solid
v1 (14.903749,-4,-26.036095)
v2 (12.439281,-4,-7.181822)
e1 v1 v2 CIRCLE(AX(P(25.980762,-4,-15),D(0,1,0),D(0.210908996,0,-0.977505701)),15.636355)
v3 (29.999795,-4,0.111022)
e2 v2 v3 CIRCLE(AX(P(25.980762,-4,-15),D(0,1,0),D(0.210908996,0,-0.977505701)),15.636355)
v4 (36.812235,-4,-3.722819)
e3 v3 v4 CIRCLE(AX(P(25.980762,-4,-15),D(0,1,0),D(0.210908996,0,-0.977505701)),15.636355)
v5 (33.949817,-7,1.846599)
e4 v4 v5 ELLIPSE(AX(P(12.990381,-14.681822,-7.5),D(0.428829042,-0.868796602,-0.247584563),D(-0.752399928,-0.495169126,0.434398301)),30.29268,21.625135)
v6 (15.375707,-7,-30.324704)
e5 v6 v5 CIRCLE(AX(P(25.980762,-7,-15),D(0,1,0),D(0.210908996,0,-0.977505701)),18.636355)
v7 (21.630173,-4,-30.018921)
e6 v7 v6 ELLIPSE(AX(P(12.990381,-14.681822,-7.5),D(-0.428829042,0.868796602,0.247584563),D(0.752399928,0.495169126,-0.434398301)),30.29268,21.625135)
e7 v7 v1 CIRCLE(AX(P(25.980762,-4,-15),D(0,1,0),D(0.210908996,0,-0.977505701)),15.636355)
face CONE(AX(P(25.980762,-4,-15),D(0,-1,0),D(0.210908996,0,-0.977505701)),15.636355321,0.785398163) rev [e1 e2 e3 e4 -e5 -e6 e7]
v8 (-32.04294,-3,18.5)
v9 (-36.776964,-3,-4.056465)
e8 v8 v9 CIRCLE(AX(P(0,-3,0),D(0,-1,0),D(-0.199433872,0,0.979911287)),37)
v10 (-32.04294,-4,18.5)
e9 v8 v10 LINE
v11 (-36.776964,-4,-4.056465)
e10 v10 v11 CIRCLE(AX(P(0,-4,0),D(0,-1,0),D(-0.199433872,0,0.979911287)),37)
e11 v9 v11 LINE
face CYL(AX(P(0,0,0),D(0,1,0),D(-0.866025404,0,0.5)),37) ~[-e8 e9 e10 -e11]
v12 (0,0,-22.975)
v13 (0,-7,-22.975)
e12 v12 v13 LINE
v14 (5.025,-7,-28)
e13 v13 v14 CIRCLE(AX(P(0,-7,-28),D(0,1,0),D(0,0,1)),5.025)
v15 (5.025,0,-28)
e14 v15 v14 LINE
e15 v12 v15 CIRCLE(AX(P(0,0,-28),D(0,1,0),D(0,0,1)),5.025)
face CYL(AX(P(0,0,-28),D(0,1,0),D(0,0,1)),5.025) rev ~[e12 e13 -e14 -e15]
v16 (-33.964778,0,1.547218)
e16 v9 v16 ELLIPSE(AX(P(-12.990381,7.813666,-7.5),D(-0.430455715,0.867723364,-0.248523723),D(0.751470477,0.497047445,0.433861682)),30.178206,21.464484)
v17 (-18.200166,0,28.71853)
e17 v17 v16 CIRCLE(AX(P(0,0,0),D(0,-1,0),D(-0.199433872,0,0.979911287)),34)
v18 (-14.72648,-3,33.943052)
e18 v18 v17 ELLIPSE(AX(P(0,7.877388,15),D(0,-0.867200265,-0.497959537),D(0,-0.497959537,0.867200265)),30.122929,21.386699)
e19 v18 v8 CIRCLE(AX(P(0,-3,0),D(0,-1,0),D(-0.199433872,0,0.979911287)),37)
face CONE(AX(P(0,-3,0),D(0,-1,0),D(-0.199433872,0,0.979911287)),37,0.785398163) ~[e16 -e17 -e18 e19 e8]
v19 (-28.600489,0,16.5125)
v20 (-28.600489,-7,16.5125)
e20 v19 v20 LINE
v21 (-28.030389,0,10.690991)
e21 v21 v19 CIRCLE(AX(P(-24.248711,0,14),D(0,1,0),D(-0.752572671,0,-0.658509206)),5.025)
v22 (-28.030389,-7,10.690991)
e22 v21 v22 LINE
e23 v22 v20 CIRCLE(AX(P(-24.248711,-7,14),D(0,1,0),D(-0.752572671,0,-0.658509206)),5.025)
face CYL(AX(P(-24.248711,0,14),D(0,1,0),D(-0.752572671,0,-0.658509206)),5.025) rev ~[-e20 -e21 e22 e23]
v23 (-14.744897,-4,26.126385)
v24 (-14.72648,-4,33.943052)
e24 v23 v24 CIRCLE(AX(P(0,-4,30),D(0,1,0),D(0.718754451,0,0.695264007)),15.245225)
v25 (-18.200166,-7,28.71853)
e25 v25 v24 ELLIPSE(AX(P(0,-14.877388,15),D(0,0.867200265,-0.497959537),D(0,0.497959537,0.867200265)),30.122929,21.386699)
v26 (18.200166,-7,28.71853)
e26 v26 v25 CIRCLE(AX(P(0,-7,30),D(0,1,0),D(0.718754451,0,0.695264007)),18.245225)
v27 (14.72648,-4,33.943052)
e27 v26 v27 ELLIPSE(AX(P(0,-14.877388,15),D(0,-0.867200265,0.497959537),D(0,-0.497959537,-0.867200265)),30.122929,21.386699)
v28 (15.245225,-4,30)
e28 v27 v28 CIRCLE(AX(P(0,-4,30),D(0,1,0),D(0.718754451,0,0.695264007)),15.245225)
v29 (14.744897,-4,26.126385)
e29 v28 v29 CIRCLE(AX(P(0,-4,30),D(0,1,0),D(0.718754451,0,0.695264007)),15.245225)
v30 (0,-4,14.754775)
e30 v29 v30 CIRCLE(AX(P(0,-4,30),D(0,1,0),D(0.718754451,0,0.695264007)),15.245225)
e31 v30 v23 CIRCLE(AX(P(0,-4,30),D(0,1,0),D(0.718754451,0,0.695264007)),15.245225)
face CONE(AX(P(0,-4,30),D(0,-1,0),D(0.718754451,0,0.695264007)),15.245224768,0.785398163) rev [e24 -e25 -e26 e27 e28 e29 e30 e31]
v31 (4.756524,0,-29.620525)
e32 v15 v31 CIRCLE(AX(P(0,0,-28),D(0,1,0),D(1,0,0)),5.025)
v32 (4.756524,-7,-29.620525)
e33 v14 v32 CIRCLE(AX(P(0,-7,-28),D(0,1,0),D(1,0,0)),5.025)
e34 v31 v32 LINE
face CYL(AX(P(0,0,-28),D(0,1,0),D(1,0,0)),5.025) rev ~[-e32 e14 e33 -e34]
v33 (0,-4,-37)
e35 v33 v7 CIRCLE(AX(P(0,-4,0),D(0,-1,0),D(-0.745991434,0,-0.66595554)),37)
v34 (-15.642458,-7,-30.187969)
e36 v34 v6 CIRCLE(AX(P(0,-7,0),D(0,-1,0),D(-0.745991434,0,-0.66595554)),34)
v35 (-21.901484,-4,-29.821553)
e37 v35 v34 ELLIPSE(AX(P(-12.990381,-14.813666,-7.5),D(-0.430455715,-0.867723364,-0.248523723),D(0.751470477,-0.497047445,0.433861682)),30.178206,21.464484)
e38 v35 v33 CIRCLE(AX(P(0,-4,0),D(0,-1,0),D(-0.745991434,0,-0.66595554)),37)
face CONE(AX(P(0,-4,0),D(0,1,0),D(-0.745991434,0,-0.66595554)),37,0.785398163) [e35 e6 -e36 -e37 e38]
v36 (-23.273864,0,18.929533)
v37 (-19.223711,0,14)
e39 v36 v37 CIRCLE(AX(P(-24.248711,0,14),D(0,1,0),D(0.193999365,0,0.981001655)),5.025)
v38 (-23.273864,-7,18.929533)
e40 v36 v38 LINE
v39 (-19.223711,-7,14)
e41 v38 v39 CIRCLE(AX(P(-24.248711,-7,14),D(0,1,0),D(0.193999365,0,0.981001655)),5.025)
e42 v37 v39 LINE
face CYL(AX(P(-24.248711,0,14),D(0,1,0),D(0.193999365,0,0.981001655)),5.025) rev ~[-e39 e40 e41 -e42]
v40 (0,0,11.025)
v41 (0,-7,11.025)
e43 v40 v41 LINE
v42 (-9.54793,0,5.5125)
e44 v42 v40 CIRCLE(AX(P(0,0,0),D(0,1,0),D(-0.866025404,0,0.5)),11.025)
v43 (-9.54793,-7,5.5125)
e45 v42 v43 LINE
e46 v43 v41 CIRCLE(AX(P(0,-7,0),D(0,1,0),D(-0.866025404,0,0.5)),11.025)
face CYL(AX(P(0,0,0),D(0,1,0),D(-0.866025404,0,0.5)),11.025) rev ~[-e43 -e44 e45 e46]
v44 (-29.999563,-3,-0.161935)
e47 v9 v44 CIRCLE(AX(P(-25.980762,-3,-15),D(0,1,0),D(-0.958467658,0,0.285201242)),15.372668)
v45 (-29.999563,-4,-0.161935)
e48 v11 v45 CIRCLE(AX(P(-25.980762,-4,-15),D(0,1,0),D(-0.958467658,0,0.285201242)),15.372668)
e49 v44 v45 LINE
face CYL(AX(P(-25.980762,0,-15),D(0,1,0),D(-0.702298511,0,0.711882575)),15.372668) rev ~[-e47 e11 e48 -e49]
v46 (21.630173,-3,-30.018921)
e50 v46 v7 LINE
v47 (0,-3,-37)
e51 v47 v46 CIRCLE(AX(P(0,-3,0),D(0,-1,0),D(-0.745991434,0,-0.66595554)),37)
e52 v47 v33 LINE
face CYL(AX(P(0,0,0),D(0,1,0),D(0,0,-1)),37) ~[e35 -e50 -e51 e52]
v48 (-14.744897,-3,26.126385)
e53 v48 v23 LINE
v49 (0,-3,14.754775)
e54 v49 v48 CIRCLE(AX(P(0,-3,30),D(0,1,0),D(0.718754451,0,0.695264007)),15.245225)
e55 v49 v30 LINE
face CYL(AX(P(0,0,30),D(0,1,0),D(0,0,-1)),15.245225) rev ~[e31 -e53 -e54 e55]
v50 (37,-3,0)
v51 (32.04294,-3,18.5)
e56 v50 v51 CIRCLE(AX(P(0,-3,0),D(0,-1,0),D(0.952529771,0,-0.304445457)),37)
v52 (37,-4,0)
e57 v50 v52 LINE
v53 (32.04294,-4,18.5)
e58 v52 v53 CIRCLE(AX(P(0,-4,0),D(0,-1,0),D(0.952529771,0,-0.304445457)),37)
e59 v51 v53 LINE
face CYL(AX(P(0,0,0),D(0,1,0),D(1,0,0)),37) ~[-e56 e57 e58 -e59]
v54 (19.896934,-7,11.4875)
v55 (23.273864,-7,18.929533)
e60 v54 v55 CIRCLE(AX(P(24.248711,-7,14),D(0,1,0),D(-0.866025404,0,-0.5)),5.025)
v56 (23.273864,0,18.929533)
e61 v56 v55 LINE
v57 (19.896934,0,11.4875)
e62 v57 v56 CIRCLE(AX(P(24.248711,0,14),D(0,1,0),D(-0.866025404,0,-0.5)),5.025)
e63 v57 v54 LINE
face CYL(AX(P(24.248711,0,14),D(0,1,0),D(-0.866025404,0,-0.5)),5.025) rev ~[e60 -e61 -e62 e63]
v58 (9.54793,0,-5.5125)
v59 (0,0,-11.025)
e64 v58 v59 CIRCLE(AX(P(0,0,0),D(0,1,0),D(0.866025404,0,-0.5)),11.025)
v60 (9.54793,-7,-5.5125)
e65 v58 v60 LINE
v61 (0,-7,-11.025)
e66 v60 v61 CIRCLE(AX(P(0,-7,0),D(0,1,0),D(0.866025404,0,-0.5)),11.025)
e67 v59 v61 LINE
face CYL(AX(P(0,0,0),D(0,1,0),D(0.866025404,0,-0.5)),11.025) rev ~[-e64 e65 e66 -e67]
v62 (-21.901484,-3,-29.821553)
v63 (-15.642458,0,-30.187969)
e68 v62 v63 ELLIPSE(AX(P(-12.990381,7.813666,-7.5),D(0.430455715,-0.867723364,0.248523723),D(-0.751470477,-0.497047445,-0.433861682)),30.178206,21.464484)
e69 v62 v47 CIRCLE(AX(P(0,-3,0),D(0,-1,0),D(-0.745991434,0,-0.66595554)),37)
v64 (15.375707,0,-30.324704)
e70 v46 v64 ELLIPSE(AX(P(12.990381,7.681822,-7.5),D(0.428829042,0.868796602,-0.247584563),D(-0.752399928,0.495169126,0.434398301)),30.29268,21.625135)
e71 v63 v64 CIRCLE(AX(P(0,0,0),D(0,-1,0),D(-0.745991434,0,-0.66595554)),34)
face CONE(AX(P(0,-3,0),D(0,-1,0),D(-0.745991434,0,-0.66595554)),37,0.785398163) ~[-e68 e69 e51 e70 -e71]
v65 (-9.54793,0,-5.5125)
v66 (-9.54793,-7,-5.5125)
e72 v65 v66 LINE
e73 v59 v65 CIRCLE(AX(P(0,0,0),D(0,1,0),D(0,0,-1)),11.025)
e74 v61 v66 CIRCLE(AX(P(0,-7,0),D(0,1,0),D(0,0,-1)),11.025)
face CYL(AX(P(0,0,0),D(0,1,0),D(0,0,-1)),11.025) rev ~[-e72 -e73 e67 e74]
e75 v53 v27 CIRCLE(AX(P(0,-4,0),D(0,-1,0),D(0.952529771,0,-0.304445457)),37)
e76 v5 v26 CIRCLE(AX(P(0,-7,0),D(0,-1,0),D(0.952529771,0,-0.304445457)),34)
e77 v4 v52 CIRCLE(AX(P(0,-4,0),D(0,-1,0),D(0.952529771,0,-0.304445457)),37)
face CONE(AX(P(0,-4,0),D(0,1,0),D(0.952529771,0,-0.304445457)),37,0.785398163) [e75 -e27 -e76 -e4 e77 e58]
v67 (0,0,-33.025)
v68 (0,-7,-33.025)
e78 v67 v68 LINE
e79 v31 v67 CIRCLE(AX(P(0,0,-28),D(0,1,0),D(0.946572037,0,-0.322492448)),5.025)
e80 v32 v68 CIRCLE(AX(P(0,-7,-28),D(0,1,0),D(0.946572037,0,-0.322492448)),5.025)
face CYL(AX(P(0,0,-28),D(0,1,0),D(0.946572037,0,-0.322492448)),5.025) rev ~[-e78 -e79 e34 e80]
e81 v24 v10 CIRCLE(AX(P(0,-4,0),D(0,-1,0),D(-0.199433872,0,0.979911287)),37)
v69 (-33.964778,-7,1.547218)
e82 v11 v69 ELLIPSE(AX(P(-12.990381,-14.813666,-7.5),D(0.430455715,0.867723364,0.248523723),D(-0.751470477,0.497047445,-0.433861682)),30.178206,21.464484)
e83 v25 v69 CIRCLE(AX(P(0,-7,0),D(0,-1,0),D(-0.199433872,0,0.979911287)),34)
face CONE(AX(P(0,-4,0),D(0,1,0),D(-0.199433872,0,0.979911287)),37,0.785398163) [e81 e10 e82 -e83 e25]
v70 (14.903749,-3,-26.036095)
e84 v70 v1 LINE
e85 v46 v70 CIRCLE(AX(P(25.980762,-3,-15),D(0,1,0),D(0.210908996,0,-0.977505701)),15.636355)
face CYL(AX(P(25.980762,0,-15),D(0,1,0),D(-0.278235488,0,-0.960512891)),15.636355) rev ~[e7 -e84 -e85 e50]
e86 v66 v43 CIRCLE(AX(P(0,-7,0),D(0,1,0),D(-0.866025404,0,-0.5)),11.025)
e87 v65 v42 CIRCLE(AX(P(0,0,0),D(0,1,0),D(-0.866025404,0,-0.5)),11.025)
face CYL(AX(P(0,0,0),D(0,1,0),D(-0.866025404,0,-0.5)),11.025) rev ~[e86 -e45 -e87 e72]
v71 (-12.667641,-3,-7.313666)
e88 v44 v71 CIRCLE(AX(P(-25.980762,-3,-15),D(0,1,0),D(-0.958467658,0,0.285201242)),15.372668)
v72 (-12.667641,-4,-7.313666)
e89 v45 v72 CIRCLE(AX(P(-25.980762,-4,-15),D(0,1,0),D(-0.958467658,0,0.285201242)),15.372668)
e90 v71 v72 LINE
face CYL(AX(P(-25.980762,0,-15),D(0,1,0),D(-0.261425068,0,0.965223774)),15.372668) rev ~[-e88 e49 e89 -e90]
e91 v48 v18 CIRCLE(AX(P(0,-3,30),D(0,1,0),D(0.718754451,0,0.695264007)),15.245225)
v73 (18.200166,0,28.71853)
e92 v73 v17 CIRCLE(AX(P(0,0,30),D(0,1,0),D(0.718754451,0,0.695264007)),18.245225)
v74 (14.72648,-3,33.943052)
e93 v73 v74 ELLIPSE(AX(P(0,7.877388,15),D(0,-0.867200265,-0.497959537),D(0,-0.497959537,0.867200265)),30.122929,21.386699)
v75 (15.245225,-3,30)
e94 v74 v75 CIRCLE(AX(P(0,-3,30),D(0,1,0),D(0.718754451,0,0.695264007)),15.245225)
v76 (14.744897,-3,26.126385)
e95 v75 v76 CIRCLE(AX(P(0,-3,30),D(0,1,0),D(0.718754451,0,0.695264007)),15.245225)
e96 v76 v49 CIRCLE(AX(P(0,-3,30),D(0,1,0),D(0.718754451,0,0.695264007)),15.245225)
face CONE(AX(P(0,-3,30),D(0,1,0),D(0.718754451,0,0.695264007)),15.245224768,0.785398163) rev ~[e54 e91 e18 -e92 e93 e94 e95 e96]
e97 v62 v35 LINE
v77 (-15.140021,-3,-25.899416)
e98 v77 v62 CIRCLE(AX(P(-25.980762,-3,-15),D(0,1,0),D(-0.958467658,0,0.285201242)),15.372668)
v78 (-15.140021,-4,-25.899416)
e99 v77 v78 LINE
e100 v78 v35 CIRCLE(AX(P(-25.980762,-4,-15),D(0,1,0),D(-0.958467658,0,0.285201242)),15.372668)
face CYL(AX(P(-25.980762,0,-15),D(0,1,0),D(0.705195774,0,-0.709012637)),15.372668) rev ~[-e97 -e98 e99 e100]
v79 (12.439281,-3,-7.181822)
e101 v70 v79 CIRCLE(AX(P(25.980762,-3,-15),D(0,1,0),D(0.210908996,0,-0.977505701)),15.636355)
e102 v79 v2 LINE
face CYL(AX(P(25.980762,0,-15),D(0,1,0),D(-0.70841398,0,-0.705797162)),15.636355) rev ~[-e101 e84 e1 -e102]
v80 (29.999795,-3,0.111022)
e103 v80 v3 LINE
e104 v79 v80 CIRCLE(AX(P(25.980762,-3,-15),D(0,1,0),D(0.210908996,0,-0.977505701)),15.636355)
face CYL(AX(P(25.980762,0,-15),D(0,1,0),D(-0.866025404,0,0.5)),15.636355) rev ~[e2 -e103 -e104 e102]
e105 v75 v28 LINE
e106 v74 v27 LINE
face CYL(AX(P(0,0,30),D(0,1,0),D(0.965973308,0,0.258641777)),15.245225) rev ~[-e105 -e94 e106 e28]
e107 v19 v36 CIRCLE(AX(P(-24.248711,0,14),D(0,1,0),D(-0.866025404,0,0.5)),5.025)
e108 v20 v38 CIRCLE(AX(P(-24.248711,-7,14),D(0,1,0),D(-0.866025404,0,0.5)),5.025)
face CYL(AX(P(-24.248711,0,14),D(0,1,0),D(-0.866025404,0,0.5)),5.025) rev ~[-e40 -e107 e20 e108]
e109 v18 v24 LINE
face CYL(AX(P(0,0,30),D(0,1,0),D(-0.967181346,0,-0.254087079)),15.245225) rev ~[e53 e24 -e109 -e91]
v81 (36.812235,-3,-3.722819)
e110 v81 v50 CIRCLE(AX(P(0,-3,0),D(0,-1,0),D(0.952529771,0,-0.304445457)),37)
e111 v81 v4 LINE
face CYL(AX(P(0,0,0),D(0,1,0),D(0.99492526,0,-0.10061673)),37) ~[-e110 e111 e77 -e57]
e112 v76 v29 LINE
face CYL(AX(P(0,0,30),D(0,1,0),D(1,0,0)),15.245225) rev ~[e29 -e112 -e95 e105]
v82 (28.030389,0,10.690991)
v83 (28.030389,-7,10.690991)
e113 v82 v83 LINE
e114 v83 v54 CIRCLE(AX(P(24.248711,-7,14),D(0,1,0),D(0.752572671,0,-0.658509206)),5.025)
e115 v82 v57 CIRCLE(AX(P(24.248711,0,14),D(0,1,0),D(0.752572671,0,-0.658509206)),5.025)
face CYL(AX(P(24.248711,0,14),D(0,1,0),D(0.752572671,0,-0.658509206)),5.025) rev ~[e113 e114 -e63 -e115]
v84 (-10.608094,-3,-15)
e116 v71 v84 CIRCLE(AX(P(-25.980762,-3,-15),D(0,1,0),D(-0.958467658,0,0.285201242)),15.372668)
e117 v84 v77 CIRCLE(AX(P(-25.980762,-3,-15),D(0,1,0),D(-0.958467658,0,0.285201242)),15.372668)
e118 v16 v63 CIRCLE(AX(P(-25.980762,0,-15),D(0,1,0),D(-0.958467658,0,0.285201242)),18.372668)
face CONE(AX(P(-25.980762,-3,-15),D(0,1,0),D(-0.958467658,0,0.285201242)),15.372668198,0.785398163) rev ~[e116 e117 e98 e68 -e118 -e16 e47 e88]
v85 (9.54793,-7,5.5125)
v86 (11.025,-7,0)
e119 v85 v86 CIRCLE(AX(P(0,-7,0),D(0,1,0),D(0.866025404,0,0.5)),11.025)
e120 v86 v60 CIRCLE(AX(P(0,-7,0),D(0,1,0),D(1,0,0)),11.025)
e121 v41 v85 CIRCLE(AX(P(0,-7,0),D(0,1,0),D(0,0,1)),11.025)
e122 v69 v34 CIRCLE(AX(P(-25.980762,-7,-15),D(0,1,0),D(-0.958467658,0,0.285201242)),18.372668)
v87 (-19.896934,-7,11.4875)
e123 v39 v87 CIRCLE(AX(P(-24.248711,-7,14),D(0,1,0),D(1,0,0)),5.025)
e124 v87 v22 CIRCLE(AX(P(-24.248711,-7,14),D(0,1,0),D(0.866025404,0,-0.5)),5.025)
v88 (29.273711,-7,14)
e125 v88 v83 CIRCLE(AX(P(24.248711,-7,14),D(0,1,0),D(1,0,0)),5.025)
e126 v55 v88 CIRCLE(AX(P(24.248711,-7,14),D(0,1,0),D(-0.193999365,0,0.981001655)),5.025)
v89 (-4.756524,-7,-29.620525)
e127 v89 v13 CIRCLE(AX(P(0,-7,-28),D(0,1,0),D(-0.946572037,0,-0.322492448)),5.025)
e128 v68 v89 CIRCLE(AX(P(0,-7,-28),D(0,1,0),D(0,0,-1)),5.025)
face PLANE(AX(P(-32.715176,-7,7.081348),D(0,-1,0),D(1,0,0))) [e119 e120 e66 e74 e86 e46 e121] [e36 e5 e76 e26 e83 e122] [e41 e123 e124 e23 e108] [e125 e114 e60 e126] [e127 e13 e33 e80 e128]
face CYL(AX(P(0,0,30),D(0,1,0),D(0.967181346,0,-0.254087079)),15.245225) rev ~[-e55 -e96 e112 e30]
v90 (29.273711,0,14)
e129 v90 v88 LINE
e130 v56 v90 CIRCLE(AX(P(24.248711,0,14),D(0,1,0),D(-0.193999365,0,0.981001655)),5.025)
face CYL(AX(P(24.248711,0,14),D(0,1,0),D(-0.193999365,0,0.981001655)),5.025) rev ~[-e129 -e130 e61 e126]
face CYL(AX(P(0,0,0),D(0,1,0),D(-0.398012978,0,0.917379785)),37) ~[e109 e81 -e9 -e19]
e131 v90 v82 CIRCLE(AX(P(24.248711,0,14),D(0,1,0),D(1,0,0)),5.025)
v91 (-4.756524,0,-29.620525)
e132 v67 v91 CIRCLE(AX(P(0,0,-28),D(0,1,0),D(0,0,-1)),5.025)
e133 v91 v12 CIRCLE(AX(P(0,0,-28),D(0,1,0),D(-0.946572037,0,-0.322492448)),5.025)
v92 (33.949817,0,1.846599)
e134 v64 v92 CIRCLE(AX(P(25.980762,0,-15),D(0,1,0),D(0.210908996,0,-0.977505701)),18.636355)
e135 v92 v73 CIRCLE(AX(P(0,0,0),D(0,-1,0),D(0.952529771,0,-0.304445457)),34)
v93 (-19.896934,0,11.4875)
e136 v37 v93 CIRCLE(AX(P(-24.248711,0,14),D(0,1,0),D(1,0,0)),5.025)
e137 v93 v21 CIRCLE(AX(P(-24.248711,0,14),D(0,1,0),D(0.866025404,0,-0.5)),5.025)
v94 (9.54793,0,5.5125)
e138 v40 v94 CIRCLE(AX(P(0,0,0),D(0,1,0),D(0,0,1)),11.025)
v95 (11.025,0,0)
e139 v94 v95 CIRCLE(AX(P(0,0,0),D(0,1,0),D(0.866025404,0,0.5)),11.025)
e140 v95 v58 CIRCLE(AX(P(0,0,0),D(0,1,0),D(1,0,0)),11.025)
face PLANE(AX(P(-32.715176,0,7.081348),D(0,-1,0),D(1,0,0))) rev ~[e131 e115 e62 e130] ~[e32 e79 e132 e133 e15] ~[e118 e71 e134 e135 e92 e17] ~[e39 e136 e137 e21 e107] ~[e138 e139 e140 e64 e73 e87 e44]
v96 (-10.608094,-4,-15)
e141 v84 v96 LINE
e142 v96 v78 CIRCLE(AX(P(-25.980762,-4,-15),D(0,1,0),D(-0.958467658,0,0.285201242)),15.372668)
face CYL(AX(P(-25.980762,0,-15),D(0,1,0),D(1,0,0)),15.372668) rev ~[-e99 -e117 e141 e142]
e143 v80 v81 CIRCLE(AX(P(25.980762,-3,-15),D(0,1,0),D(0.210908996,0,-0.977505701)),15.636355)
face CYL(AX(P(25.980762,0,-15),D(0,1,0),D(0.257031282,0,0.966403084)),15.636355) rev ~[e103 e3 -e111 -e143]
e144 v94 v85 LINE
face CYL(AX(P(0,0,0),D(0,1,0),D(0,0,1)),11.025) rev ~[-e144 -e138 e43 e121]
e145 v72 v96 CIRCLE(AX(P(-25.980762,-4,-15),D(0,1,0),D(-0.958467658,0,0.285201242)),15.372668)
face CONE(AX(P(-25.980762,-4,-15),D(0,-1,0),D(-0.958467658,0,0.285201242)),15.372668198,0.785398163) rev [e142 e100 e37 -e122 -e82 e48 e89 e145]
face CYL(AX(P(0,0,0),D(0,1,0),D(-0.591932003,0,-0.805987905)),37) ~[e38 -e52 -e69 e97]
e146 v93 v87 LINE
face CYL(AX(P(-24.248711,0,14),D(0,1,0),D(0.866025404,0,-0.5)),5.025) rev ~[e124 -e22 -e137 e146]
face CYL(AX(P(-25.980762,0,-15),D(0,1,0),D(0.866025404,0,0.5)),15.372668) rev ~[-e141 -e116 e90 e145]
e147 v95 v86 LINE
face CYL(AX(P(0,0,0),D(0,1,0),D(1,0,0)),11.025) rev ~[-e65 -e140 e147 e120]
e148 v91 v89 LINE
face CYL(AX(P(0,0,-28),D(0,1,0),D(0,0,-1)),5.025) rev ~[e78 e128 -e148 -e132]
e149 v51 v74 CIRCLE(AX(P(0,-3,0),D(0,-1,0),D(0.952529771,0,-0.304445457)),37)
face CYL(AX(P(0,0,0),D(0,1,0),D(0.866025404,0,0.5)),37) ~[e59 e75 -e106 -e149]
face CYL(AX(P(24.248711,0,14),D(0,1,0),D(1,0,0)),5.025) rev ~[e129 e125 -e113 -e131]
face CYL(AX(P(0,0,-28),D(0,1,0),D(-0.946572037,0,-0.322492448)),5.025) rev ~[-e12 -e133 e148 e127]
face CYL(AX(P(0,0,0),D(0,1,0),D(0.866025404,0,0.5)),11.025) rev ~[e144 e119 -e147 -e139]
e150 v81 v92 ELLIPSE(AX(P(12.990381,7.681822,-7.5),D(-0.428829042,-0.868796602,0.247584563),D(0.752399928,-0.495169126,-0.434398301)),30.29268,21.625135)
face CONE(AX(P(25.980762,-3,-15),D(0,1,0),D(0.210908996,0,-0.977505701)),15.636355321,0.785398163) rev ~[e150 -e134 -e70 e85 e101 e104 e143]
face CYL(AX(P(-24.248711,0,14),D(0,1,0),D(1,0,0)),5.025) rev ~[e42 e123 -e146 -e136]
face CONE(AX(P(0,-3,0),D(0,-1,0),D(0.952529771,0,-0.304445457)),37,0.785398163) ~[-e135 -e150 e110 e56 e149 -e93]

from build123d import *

# Parameters (mm, degrees)
F1_DEPTH     = 7
F2_T2_ANGLE  = 96.7405372454
F2_T4_ANGLE  = 266.8582437325
F2_T6_ANGLE  = 95.969109219
F2_T8_ANGLE  = 264.3512540772
F2_T10_ANGLE = 268.0965177518
F2_T12_ANGLE = 96.2209043171
F2_T14_ANGLE = 96.2209043171
F2_T16_ANGLE = 264.3512540772
F2_T18_ANGLE = 95.969109219
F2_T20_ANGLE = 266.8582437325
F2_T22_ANGLE = 96.7405372454
F2_T24_ANGLE = 268.0965177518


# Not quite as in the source:
# - a fillet or chamfer that OpenCascade refuses, or shapes differently, is made with other operations: its cross-section is extruded or revolved along the edge and cut away or added


with BuildPart() as f1:
    # F0 (on Front) → F1 (new body)
    with BuildSketch(Plane.XZ):
        with BuildLine():
            Line((-28.60048896, 16.5125), (-32.04293994, 18.5))
            ThreePointArc((-32.04293994, 18.5), (-36.2110940276, 7.5997808734), (-36.7769641036, -4.0564653732))
            ThreePointArc((-36.7769641036, -4.0564653732), (-33.6399342951, -1.6712337769), (-29.9995629467, -0.1619351868))
            ThreePointArc((-29.9995629467, -0.1619351868), (-29.5180509711, 5.3558068364), (-28.030388979, 10.6909912395))
            ThreePointArc((-28.030388979, 10.6909912395), (-29.2497876853, 13.5102449097), (-28.60048896, 16.5125))
        make_face()
        with BuildLine():
            ThreePointArc((-28.030388979, 10.6909912395), (-29.5180509711, 5.3558068364), (-29.9995629467, -0.1619351868))
            ThreePointArc((-29.9995629467, -0.1619351868), (-20.1170678219, -0.7895806962), (-12.6676409298, -7.3136659008))
            Line((-12.6676409298, -7.3136659008), (-9.5479300767, -5.5125))
            ThreePointArc((-9.5479300767, -5.5125), (-11.025, 0), (-9.5479300767, 5.5125))
            Line((-9.5479300767, 5.5125), (-19.8969336519, 11.4875))
            ThreePointArc((-19.8969336519, 11.4875), (-23.7589562157, 8.9989236207), (-28.030388979, 10.6909912395))
        make_face()
        with BuildLine():
            ThreePointArc((0, 14.7547752324), (-9.310283358, 17.9279039927), (-14.7448970108, 26.1263853631))
            ThreePointArc((-14.7448970108, 26.1263853631), (-19.3469694385, 22.9280346638), (-23.2738644946, 18.9295333141))
            ThreePointArc((-23.2738644946, 18.9295333141), (-20.3661071395, 17.1899858756), (-19.223711306, 14))
            ThreePointArc((-19.223711306, 14), (-19.3949340289, 12.6994342984), (-19.8969336519, 11.4875))
            Line((-19.8969336519, 11.4875), (-9.5479300767, 5.5125))
            ThreePointArc((-9.5479300767, 5.5125), (-5.5125, 9.5479300767), (0, 11.025))
            Line((0, 11.025), (0, 14.7547752324))
        make_face()
        with BuildLine():
            ThreePointArc((-14.7448970108, 26.1263853631), (-15.2451824532, 30.0359191128), (-14.726480194, 33.9430520298))
            ThreePointArc((-14.726480194, 33.9430520298), (-24.6265431784, 27.6140067915), (-32.04293994, 18.5))
            Line((-32.04293994, 18.5), (-28.60048896, 16.5125))
            ThreePointArc((-28.60048896, 16.5125), (-26.3251091458, 18.5759367359), (-23.2738644946, 18.9295333141))
            ThreePointArc((-23.2738644946, 18.9295333141), (-19.3469694385, 22.9280346638), (-14.7448970108, 26.1263853631))
        make_face()
        with BuildLine():
            ThreePointArc((19.8969336519, 11.4875), (19.6727745701, 16.0763978398), (23.2738644946, 18.9295333141))
            ThreePointArc((23.2738644946, 18.9295333141), (19.3469694385, 22.9280346638), (14.7448970108, 26.1263853631))
            ThreePointArc((14.7448970108, 26.1263853631), (9.310283358, 17.9279039927), (0, 14.7547752324))
            Line((0, 14.7547752324), (0, 11.025))
            ThreePointArc((0, 11.025), (5.5125, 9.5479300767), (9.5479300767, 5.5125))
            Line((9.5479300767, 5.5125), (19.8969336519, 11.4875))
        make_face()
        with BuildLine():
            Line((28.60048896, 16.5125), (32.04293994, 18.5))
            ThreePointArc((32.04293994, 18.5), (24.6265431784, 27.6140067915), (14.726480194, 33.9430520298))
            ThreePointArc((14.726480194, 33.9430520298), (15.1149822826, 31.9885142218), (15.2452247676, 30))
            ThreePointArc((15.2452247676, 30), (15.1196254471, 28.0471035473), (14.7448970108, 26.1263853631))
            ThreePointArc((14.7448970108, 26.1263853631), (19.3469694385, 22.9280346638), (23.2738644946, 18.9295333141))
            ThreePointArc((23.2738644946, 18.9295333141), (26.3251091458, 18.5759367359), (28.60048896, 16.5125))
        make_face()
        with BuildLine():
            ThreePointArc((36.8122346311, -3.7228190211), (36.9530288431, -1.8637755563), (37, 0))
            ThreePointArc((37, 0), (35.7392555727, 9.5763046688), (32.04293994, 18.5))
            Line((32.04293994, 18.5), (28.60048896, 16.5125))
            ThreePointArc((28.60048896, 16.5125), (29.1024885831, 15.3005657016), (29.273711306, 14))
            ThreePointArc((29.273711306, 14), (28.9526221952, 12.2325590968), (28.030388979, 10.6909912395))
            ThreePointArc((28.030388979, 10.6909912395), (29.4933804082, 5.4900375314), (29.9997945679, 0.1110219992))
            ThreePointArc((29.9997945679, 0.1110219992), (33.6494620505, -1.3733111503), (36.8122346311, -3.7228190211))
        make_face()
        with BuildLine():
            ThreePointArc((12.4392811828, -7.1818223394), (19.983625223, -0.5594336383), (29.9997945679, 0.1110219992))
            ThreePointArc((29.9997945679, 0.1110219992), (29.4933804082, 5.4900375314), (28.030388979, 10.6909912395))
            ThreePointArc((28.030388979, 10.6909912395), (23.7589562157, 8.9989236207), (19.8969336519, 11.4875))
            Line((19.8969336519, 11.4875), (9.5479300767, 5.5125))
            ThreePointArc((9.5479300767, 5.5125), (10.6493322348, 2.8534799723), (11.025, 0))
            ThreePointArc((11.025, 0), (10.6493322348, -2.8534799723), (9.5479300767, -5.5125))
            Line((9.5479300767, -5.5125), (12.4392811828, -7.1818223394))
        make_face()
        with BuildLine():
            ThreePointArc((4.7565244845, -29.6205245536), (9.9921782342, -28.2870354427), (14.9037494122, -26.0360952037))
            ThreePointArc((14.9037494122, -26.0360952037), (10.476296354, -17.0266102837), (12.4392811828, -7.1818223394))
            Line((12.4392811828, -7.1818223394), (9.5479300767, -5.5125))
            ThreePointArc((9.5479300767, -5.5125), (5.5125, -9.5479300767), (0, -11.025))
            Line((0, -11.025), (0, -22.975))
            ThreePointArc((0, -22.975), (3.5532115755, -24.4467884245), (5.025, -28))
            ThreePointArc((5.025, -28), (4.9574267788, -28.8213067227), (4.7565244845, -29.6205245536))
        make_face()
        with BuildLine():
            ThreePointArc((-10.6080939152, -15), (-11.7862202639, -20.9020258568), (-15.1400214589, -25.8994160209))
            ThreePointArc((-15.1400214589, -25.8994160209), (-10.1207607074, -28.2412854294), (-4.7565244845, -29.6205245536))
            ThreePointArc((-4.7565244845, -29.6205245536), (-4.0861816456, -25.0753214605), (0, -22.975))
            Line((0, -22.975), (0, -11.025))
            ThreePointArc((0, -11.025), (-5.5125, -9.5479300767), (-9.5479300767, -5.5125))
            Line((-9.5479300767, -5.5125), (-12.6676409298, -7.3136659008))
            ThreePointArc((-12.6676409298, -7.3136659008), (-11.1319048818, -11.0212606962), (-10.6080939152, -15))
        make_face()
        with BuildLine():
            ThreePointArc((-21.9014841146, -29.8215525011), (-11.5239437142, -35.1596177634), (0, -37))
            Line((0, -37), (0, -33.025))
            ThreePointArc((0, -33.025), (-2.9246785395, -32.0861816456), (-4.7565244845, -29.6205245536))
            ThreePointArc((-4.7565244845, -29.6205245536), (-10.1207607074, -28.2412854294), (-15.1400214589, -25.8994160209))
            ThreePointArc((-15.1400214589, -25.8994160209), (-18.267298054, -28.2974207927), (-21.9014841146, -29.8215525011))
        make_face()
        with BuildLine():
            ThreePointArc((0, -37), (11.3644165831, -35.2115043093), (21.6301731615, -30.0189208501))
            ThreePointArc((21.6301731615, -30.0189208501), (18.0140533687, -28.4546333842), (14.9037494122, -26.0360952037))
            ThreePointArc((14.9037494122, -26.0360952037), (9.9921782342, -28.2870354427), (4.7565244845, -29.6205245536))
            ThreePointArc((4.7565244845, -29.6205245536), (2.9246785395, -32.0861816456), (0, -33.025))
            Line((0, -33.025), (0, -37))
        make_face()
    extrude(amount=F1_DEPTH)

    # F2: chamfer of 3 on 12 edges, made by hand

    # F2_s1 → F2_t2 (revolve, cut)
    with BuildSketch(Plane(origin=(0, 0, 0), x_dir=(0, 1, 0), z_dir=(0.9799112872, 0, 0.199433872))):
        Polygon((-4, 37), (-7, 34), (-7, 37), align=None)
    revolve(axis=Axis((0, -7, 0), (0, -1, 0)), revolution_arc=F2_T2_ANGLE, mode=Mode.SUBTRACT)

    # F2_s3 → F2_t4 (revolve, cut)
    with BuildSketch(Plane(origin=(-6.2136111397, 0, -20.8819053013), x_dir=(0, 1, 0), z_dir=(-0.2852012416, 0, -0.9584676582))):
        Polygon((-4, -35.9963697961), (-7, -38.9963697961), (-7, -35.9963697961), align=None)
    revolve(axis=Axis((-25.9807621135, -7, -15), (0, 1, 0)), revolution_arc=F2_T4_ANGLE, mode=Mode.SUBTRACT)

    # F2_s5 → F2_t6 (revolve, cut)
    with BuildSketch(Plane(origin=(0, 0, 0), x_dir=(0, 1, 0), z_dir=(-0.6659555398, 0, 0.7459914336))):
        Polygon((-4, 37), (-7, 34), (-7, 37), align=None)
    revolve(axis=Axis((0, -7, 0), (0, -1, 0)), revolution_arc=F2_T6_ANGLE, mode=Mode.SUBTRACT)

    # F2_s7 → F2_t8 (revolve, cut)
    with BuildSketch(Plane(origin=(21.7325989573, 0, 4.6890781514), x_dir=(0, 1, 0), z_dir=(0.977505701, 0, 0.2109089959))):
        Polygon((-4, -35.7785172869), (-7, -38.7785172869), (-7, -35.7785172869), align=None)
    revolve(axis=Axis((25.9807621135, -7, -15), (0, 1, 0)), revolution_arc=F2_T8_ANGLE, mode=Mode.SUBTRACT)

    # F2_s9 → F2_t10 (revolve, cut)
    with BuildSketch(Plane(origin=(-14.9917229855, 0, 15.4982388241), x_dir=(0, 1, 0), z_dir=(-0.6952640068, 0, 0.718754451))):
        Polygon((-4, -36.1031449725), (-7, -39.1031449725), (-7, -36.1031449725), align=None)
    revolve(axis=Axis((0, -7, 30), (0, 1, 0)), revolution_arc=F2_T10_ANGLE, mode=Mode.SUBTRACT)

    # F2_s11 → F2_t12 (revolve, cut)
    with BuildSketch(Plane(origin=(0, 0, 0), x_dir=(0, 1, 0), z_dir=(-0.3044454567, 0, -0.9525297706))):
        Polygon((-4, 37), (-7, 34), (-7, 37), align=None)
    revolve(axis=Axis((0, -7, 0), (0, -1, 0)), revolution_arc=F2_T12_ANGLE, mode=Mode.SUBTRACT)

    # F2_s13 → F2_t14 (revolve, cut)
    with BuildSketch(Plane(origin=(0, 0, 0), x_dir=(0, 1, 0), z_dir=(-0.3044454567, 0, -0.9525297706))):
        Polygon((-3, 37), (0, 34), (0, 37), align=None)
    revolve(axis=Axis((0, 0, 0), (0, -1, 0)), revolution_arc=F2_T14_ANGLE, mode=Mode.SUBTRACT)

    # F2_s15 → F2_t16 (revolve, cut)
    with BuildSketch(Plane(origin=(21.7325989573, 0, 4.6890781514), x_dir=(0, 1, 0), z_dir=(0.977505701, 0, 0.2109089959))):
        Polygon((-3, -35.7785172869), (0, -38.7785172869), (0, -35.7785172869), align=None)
    revolve(axis=Axis((25.9807621135, 0, -15), (0, 1, 0)), revolution_arc=F2_T16_ANGLE, mode=Mode.SUBTRACT)

    # F2_s17 → F2_t18 (revolve, cut)
    with BuildSketch(Plane(origin=(0, 0, 0), x_dir=(0, 1, 0), z_dir=(-0.6659555398, 0, 0.7459914336))):
        Polygon((-3, 37), (0, 34), (0, 37), align=None)
    revolve(axis=Axis((0, 0, 0), (0, -1, 0)), revolution_arc=F2_T18_ANGLE, mode=Mode.SUBTRACT)

    # F2_s19 → F2_t20 (revolve, cut)
    with BuildSketch(Plane(origin=(-6.2136111397, 0, -20.8819053013), x_dir=(0, 1, 0), z_dir=(-0.2852012416, 0, -0.9584676582))):
        Polygon((-3, -35.9963697961), (0, -38.9963697961), (0, -35.9963697961), align=None)
    revolve(axis=Axis((-25.9807621135, 0, -15), (0, 1, 0)), revolution_arc=F2_T20_ANGLE, mode=Mode.SUBTRACT)

    # F2_s21 → F2_t22 (revolve, cut)
    with BuildSketch(Plane(origin=(0, 0, 0), x_dir=(0, 1, 0), z_dir=(0.9799112872, 0, 0.199433872))):
        Polygon((-3, 37), (0, 34), (0, 37), align=None)
    revolve(axis=Axis((0, 0, 0), (0, -1, 0)), revolution_arc=F2_T22_ANGLE, mode=Mode.SUBTRACT)

    # F2_s23 → F2_t24 (revolve, cut)
    with BuildSketch(Plane(origin=(-14.9917229855, 0, 15.4982388241), x_dir=(0, 1, 0), z_dir=(-0.6952640068, 0, 0.718754451))):
        Polygon((-3, -36.1031449725), (0, -39.1031449725), (0, -36.1031449725), align=None)
    revolve(axis=Axis((0, 0, 30), (0, 1, 0)), revolution_arc=F2_T24_ANGLE, mode=Mode.SUBTRACT)


solid = f1.part
